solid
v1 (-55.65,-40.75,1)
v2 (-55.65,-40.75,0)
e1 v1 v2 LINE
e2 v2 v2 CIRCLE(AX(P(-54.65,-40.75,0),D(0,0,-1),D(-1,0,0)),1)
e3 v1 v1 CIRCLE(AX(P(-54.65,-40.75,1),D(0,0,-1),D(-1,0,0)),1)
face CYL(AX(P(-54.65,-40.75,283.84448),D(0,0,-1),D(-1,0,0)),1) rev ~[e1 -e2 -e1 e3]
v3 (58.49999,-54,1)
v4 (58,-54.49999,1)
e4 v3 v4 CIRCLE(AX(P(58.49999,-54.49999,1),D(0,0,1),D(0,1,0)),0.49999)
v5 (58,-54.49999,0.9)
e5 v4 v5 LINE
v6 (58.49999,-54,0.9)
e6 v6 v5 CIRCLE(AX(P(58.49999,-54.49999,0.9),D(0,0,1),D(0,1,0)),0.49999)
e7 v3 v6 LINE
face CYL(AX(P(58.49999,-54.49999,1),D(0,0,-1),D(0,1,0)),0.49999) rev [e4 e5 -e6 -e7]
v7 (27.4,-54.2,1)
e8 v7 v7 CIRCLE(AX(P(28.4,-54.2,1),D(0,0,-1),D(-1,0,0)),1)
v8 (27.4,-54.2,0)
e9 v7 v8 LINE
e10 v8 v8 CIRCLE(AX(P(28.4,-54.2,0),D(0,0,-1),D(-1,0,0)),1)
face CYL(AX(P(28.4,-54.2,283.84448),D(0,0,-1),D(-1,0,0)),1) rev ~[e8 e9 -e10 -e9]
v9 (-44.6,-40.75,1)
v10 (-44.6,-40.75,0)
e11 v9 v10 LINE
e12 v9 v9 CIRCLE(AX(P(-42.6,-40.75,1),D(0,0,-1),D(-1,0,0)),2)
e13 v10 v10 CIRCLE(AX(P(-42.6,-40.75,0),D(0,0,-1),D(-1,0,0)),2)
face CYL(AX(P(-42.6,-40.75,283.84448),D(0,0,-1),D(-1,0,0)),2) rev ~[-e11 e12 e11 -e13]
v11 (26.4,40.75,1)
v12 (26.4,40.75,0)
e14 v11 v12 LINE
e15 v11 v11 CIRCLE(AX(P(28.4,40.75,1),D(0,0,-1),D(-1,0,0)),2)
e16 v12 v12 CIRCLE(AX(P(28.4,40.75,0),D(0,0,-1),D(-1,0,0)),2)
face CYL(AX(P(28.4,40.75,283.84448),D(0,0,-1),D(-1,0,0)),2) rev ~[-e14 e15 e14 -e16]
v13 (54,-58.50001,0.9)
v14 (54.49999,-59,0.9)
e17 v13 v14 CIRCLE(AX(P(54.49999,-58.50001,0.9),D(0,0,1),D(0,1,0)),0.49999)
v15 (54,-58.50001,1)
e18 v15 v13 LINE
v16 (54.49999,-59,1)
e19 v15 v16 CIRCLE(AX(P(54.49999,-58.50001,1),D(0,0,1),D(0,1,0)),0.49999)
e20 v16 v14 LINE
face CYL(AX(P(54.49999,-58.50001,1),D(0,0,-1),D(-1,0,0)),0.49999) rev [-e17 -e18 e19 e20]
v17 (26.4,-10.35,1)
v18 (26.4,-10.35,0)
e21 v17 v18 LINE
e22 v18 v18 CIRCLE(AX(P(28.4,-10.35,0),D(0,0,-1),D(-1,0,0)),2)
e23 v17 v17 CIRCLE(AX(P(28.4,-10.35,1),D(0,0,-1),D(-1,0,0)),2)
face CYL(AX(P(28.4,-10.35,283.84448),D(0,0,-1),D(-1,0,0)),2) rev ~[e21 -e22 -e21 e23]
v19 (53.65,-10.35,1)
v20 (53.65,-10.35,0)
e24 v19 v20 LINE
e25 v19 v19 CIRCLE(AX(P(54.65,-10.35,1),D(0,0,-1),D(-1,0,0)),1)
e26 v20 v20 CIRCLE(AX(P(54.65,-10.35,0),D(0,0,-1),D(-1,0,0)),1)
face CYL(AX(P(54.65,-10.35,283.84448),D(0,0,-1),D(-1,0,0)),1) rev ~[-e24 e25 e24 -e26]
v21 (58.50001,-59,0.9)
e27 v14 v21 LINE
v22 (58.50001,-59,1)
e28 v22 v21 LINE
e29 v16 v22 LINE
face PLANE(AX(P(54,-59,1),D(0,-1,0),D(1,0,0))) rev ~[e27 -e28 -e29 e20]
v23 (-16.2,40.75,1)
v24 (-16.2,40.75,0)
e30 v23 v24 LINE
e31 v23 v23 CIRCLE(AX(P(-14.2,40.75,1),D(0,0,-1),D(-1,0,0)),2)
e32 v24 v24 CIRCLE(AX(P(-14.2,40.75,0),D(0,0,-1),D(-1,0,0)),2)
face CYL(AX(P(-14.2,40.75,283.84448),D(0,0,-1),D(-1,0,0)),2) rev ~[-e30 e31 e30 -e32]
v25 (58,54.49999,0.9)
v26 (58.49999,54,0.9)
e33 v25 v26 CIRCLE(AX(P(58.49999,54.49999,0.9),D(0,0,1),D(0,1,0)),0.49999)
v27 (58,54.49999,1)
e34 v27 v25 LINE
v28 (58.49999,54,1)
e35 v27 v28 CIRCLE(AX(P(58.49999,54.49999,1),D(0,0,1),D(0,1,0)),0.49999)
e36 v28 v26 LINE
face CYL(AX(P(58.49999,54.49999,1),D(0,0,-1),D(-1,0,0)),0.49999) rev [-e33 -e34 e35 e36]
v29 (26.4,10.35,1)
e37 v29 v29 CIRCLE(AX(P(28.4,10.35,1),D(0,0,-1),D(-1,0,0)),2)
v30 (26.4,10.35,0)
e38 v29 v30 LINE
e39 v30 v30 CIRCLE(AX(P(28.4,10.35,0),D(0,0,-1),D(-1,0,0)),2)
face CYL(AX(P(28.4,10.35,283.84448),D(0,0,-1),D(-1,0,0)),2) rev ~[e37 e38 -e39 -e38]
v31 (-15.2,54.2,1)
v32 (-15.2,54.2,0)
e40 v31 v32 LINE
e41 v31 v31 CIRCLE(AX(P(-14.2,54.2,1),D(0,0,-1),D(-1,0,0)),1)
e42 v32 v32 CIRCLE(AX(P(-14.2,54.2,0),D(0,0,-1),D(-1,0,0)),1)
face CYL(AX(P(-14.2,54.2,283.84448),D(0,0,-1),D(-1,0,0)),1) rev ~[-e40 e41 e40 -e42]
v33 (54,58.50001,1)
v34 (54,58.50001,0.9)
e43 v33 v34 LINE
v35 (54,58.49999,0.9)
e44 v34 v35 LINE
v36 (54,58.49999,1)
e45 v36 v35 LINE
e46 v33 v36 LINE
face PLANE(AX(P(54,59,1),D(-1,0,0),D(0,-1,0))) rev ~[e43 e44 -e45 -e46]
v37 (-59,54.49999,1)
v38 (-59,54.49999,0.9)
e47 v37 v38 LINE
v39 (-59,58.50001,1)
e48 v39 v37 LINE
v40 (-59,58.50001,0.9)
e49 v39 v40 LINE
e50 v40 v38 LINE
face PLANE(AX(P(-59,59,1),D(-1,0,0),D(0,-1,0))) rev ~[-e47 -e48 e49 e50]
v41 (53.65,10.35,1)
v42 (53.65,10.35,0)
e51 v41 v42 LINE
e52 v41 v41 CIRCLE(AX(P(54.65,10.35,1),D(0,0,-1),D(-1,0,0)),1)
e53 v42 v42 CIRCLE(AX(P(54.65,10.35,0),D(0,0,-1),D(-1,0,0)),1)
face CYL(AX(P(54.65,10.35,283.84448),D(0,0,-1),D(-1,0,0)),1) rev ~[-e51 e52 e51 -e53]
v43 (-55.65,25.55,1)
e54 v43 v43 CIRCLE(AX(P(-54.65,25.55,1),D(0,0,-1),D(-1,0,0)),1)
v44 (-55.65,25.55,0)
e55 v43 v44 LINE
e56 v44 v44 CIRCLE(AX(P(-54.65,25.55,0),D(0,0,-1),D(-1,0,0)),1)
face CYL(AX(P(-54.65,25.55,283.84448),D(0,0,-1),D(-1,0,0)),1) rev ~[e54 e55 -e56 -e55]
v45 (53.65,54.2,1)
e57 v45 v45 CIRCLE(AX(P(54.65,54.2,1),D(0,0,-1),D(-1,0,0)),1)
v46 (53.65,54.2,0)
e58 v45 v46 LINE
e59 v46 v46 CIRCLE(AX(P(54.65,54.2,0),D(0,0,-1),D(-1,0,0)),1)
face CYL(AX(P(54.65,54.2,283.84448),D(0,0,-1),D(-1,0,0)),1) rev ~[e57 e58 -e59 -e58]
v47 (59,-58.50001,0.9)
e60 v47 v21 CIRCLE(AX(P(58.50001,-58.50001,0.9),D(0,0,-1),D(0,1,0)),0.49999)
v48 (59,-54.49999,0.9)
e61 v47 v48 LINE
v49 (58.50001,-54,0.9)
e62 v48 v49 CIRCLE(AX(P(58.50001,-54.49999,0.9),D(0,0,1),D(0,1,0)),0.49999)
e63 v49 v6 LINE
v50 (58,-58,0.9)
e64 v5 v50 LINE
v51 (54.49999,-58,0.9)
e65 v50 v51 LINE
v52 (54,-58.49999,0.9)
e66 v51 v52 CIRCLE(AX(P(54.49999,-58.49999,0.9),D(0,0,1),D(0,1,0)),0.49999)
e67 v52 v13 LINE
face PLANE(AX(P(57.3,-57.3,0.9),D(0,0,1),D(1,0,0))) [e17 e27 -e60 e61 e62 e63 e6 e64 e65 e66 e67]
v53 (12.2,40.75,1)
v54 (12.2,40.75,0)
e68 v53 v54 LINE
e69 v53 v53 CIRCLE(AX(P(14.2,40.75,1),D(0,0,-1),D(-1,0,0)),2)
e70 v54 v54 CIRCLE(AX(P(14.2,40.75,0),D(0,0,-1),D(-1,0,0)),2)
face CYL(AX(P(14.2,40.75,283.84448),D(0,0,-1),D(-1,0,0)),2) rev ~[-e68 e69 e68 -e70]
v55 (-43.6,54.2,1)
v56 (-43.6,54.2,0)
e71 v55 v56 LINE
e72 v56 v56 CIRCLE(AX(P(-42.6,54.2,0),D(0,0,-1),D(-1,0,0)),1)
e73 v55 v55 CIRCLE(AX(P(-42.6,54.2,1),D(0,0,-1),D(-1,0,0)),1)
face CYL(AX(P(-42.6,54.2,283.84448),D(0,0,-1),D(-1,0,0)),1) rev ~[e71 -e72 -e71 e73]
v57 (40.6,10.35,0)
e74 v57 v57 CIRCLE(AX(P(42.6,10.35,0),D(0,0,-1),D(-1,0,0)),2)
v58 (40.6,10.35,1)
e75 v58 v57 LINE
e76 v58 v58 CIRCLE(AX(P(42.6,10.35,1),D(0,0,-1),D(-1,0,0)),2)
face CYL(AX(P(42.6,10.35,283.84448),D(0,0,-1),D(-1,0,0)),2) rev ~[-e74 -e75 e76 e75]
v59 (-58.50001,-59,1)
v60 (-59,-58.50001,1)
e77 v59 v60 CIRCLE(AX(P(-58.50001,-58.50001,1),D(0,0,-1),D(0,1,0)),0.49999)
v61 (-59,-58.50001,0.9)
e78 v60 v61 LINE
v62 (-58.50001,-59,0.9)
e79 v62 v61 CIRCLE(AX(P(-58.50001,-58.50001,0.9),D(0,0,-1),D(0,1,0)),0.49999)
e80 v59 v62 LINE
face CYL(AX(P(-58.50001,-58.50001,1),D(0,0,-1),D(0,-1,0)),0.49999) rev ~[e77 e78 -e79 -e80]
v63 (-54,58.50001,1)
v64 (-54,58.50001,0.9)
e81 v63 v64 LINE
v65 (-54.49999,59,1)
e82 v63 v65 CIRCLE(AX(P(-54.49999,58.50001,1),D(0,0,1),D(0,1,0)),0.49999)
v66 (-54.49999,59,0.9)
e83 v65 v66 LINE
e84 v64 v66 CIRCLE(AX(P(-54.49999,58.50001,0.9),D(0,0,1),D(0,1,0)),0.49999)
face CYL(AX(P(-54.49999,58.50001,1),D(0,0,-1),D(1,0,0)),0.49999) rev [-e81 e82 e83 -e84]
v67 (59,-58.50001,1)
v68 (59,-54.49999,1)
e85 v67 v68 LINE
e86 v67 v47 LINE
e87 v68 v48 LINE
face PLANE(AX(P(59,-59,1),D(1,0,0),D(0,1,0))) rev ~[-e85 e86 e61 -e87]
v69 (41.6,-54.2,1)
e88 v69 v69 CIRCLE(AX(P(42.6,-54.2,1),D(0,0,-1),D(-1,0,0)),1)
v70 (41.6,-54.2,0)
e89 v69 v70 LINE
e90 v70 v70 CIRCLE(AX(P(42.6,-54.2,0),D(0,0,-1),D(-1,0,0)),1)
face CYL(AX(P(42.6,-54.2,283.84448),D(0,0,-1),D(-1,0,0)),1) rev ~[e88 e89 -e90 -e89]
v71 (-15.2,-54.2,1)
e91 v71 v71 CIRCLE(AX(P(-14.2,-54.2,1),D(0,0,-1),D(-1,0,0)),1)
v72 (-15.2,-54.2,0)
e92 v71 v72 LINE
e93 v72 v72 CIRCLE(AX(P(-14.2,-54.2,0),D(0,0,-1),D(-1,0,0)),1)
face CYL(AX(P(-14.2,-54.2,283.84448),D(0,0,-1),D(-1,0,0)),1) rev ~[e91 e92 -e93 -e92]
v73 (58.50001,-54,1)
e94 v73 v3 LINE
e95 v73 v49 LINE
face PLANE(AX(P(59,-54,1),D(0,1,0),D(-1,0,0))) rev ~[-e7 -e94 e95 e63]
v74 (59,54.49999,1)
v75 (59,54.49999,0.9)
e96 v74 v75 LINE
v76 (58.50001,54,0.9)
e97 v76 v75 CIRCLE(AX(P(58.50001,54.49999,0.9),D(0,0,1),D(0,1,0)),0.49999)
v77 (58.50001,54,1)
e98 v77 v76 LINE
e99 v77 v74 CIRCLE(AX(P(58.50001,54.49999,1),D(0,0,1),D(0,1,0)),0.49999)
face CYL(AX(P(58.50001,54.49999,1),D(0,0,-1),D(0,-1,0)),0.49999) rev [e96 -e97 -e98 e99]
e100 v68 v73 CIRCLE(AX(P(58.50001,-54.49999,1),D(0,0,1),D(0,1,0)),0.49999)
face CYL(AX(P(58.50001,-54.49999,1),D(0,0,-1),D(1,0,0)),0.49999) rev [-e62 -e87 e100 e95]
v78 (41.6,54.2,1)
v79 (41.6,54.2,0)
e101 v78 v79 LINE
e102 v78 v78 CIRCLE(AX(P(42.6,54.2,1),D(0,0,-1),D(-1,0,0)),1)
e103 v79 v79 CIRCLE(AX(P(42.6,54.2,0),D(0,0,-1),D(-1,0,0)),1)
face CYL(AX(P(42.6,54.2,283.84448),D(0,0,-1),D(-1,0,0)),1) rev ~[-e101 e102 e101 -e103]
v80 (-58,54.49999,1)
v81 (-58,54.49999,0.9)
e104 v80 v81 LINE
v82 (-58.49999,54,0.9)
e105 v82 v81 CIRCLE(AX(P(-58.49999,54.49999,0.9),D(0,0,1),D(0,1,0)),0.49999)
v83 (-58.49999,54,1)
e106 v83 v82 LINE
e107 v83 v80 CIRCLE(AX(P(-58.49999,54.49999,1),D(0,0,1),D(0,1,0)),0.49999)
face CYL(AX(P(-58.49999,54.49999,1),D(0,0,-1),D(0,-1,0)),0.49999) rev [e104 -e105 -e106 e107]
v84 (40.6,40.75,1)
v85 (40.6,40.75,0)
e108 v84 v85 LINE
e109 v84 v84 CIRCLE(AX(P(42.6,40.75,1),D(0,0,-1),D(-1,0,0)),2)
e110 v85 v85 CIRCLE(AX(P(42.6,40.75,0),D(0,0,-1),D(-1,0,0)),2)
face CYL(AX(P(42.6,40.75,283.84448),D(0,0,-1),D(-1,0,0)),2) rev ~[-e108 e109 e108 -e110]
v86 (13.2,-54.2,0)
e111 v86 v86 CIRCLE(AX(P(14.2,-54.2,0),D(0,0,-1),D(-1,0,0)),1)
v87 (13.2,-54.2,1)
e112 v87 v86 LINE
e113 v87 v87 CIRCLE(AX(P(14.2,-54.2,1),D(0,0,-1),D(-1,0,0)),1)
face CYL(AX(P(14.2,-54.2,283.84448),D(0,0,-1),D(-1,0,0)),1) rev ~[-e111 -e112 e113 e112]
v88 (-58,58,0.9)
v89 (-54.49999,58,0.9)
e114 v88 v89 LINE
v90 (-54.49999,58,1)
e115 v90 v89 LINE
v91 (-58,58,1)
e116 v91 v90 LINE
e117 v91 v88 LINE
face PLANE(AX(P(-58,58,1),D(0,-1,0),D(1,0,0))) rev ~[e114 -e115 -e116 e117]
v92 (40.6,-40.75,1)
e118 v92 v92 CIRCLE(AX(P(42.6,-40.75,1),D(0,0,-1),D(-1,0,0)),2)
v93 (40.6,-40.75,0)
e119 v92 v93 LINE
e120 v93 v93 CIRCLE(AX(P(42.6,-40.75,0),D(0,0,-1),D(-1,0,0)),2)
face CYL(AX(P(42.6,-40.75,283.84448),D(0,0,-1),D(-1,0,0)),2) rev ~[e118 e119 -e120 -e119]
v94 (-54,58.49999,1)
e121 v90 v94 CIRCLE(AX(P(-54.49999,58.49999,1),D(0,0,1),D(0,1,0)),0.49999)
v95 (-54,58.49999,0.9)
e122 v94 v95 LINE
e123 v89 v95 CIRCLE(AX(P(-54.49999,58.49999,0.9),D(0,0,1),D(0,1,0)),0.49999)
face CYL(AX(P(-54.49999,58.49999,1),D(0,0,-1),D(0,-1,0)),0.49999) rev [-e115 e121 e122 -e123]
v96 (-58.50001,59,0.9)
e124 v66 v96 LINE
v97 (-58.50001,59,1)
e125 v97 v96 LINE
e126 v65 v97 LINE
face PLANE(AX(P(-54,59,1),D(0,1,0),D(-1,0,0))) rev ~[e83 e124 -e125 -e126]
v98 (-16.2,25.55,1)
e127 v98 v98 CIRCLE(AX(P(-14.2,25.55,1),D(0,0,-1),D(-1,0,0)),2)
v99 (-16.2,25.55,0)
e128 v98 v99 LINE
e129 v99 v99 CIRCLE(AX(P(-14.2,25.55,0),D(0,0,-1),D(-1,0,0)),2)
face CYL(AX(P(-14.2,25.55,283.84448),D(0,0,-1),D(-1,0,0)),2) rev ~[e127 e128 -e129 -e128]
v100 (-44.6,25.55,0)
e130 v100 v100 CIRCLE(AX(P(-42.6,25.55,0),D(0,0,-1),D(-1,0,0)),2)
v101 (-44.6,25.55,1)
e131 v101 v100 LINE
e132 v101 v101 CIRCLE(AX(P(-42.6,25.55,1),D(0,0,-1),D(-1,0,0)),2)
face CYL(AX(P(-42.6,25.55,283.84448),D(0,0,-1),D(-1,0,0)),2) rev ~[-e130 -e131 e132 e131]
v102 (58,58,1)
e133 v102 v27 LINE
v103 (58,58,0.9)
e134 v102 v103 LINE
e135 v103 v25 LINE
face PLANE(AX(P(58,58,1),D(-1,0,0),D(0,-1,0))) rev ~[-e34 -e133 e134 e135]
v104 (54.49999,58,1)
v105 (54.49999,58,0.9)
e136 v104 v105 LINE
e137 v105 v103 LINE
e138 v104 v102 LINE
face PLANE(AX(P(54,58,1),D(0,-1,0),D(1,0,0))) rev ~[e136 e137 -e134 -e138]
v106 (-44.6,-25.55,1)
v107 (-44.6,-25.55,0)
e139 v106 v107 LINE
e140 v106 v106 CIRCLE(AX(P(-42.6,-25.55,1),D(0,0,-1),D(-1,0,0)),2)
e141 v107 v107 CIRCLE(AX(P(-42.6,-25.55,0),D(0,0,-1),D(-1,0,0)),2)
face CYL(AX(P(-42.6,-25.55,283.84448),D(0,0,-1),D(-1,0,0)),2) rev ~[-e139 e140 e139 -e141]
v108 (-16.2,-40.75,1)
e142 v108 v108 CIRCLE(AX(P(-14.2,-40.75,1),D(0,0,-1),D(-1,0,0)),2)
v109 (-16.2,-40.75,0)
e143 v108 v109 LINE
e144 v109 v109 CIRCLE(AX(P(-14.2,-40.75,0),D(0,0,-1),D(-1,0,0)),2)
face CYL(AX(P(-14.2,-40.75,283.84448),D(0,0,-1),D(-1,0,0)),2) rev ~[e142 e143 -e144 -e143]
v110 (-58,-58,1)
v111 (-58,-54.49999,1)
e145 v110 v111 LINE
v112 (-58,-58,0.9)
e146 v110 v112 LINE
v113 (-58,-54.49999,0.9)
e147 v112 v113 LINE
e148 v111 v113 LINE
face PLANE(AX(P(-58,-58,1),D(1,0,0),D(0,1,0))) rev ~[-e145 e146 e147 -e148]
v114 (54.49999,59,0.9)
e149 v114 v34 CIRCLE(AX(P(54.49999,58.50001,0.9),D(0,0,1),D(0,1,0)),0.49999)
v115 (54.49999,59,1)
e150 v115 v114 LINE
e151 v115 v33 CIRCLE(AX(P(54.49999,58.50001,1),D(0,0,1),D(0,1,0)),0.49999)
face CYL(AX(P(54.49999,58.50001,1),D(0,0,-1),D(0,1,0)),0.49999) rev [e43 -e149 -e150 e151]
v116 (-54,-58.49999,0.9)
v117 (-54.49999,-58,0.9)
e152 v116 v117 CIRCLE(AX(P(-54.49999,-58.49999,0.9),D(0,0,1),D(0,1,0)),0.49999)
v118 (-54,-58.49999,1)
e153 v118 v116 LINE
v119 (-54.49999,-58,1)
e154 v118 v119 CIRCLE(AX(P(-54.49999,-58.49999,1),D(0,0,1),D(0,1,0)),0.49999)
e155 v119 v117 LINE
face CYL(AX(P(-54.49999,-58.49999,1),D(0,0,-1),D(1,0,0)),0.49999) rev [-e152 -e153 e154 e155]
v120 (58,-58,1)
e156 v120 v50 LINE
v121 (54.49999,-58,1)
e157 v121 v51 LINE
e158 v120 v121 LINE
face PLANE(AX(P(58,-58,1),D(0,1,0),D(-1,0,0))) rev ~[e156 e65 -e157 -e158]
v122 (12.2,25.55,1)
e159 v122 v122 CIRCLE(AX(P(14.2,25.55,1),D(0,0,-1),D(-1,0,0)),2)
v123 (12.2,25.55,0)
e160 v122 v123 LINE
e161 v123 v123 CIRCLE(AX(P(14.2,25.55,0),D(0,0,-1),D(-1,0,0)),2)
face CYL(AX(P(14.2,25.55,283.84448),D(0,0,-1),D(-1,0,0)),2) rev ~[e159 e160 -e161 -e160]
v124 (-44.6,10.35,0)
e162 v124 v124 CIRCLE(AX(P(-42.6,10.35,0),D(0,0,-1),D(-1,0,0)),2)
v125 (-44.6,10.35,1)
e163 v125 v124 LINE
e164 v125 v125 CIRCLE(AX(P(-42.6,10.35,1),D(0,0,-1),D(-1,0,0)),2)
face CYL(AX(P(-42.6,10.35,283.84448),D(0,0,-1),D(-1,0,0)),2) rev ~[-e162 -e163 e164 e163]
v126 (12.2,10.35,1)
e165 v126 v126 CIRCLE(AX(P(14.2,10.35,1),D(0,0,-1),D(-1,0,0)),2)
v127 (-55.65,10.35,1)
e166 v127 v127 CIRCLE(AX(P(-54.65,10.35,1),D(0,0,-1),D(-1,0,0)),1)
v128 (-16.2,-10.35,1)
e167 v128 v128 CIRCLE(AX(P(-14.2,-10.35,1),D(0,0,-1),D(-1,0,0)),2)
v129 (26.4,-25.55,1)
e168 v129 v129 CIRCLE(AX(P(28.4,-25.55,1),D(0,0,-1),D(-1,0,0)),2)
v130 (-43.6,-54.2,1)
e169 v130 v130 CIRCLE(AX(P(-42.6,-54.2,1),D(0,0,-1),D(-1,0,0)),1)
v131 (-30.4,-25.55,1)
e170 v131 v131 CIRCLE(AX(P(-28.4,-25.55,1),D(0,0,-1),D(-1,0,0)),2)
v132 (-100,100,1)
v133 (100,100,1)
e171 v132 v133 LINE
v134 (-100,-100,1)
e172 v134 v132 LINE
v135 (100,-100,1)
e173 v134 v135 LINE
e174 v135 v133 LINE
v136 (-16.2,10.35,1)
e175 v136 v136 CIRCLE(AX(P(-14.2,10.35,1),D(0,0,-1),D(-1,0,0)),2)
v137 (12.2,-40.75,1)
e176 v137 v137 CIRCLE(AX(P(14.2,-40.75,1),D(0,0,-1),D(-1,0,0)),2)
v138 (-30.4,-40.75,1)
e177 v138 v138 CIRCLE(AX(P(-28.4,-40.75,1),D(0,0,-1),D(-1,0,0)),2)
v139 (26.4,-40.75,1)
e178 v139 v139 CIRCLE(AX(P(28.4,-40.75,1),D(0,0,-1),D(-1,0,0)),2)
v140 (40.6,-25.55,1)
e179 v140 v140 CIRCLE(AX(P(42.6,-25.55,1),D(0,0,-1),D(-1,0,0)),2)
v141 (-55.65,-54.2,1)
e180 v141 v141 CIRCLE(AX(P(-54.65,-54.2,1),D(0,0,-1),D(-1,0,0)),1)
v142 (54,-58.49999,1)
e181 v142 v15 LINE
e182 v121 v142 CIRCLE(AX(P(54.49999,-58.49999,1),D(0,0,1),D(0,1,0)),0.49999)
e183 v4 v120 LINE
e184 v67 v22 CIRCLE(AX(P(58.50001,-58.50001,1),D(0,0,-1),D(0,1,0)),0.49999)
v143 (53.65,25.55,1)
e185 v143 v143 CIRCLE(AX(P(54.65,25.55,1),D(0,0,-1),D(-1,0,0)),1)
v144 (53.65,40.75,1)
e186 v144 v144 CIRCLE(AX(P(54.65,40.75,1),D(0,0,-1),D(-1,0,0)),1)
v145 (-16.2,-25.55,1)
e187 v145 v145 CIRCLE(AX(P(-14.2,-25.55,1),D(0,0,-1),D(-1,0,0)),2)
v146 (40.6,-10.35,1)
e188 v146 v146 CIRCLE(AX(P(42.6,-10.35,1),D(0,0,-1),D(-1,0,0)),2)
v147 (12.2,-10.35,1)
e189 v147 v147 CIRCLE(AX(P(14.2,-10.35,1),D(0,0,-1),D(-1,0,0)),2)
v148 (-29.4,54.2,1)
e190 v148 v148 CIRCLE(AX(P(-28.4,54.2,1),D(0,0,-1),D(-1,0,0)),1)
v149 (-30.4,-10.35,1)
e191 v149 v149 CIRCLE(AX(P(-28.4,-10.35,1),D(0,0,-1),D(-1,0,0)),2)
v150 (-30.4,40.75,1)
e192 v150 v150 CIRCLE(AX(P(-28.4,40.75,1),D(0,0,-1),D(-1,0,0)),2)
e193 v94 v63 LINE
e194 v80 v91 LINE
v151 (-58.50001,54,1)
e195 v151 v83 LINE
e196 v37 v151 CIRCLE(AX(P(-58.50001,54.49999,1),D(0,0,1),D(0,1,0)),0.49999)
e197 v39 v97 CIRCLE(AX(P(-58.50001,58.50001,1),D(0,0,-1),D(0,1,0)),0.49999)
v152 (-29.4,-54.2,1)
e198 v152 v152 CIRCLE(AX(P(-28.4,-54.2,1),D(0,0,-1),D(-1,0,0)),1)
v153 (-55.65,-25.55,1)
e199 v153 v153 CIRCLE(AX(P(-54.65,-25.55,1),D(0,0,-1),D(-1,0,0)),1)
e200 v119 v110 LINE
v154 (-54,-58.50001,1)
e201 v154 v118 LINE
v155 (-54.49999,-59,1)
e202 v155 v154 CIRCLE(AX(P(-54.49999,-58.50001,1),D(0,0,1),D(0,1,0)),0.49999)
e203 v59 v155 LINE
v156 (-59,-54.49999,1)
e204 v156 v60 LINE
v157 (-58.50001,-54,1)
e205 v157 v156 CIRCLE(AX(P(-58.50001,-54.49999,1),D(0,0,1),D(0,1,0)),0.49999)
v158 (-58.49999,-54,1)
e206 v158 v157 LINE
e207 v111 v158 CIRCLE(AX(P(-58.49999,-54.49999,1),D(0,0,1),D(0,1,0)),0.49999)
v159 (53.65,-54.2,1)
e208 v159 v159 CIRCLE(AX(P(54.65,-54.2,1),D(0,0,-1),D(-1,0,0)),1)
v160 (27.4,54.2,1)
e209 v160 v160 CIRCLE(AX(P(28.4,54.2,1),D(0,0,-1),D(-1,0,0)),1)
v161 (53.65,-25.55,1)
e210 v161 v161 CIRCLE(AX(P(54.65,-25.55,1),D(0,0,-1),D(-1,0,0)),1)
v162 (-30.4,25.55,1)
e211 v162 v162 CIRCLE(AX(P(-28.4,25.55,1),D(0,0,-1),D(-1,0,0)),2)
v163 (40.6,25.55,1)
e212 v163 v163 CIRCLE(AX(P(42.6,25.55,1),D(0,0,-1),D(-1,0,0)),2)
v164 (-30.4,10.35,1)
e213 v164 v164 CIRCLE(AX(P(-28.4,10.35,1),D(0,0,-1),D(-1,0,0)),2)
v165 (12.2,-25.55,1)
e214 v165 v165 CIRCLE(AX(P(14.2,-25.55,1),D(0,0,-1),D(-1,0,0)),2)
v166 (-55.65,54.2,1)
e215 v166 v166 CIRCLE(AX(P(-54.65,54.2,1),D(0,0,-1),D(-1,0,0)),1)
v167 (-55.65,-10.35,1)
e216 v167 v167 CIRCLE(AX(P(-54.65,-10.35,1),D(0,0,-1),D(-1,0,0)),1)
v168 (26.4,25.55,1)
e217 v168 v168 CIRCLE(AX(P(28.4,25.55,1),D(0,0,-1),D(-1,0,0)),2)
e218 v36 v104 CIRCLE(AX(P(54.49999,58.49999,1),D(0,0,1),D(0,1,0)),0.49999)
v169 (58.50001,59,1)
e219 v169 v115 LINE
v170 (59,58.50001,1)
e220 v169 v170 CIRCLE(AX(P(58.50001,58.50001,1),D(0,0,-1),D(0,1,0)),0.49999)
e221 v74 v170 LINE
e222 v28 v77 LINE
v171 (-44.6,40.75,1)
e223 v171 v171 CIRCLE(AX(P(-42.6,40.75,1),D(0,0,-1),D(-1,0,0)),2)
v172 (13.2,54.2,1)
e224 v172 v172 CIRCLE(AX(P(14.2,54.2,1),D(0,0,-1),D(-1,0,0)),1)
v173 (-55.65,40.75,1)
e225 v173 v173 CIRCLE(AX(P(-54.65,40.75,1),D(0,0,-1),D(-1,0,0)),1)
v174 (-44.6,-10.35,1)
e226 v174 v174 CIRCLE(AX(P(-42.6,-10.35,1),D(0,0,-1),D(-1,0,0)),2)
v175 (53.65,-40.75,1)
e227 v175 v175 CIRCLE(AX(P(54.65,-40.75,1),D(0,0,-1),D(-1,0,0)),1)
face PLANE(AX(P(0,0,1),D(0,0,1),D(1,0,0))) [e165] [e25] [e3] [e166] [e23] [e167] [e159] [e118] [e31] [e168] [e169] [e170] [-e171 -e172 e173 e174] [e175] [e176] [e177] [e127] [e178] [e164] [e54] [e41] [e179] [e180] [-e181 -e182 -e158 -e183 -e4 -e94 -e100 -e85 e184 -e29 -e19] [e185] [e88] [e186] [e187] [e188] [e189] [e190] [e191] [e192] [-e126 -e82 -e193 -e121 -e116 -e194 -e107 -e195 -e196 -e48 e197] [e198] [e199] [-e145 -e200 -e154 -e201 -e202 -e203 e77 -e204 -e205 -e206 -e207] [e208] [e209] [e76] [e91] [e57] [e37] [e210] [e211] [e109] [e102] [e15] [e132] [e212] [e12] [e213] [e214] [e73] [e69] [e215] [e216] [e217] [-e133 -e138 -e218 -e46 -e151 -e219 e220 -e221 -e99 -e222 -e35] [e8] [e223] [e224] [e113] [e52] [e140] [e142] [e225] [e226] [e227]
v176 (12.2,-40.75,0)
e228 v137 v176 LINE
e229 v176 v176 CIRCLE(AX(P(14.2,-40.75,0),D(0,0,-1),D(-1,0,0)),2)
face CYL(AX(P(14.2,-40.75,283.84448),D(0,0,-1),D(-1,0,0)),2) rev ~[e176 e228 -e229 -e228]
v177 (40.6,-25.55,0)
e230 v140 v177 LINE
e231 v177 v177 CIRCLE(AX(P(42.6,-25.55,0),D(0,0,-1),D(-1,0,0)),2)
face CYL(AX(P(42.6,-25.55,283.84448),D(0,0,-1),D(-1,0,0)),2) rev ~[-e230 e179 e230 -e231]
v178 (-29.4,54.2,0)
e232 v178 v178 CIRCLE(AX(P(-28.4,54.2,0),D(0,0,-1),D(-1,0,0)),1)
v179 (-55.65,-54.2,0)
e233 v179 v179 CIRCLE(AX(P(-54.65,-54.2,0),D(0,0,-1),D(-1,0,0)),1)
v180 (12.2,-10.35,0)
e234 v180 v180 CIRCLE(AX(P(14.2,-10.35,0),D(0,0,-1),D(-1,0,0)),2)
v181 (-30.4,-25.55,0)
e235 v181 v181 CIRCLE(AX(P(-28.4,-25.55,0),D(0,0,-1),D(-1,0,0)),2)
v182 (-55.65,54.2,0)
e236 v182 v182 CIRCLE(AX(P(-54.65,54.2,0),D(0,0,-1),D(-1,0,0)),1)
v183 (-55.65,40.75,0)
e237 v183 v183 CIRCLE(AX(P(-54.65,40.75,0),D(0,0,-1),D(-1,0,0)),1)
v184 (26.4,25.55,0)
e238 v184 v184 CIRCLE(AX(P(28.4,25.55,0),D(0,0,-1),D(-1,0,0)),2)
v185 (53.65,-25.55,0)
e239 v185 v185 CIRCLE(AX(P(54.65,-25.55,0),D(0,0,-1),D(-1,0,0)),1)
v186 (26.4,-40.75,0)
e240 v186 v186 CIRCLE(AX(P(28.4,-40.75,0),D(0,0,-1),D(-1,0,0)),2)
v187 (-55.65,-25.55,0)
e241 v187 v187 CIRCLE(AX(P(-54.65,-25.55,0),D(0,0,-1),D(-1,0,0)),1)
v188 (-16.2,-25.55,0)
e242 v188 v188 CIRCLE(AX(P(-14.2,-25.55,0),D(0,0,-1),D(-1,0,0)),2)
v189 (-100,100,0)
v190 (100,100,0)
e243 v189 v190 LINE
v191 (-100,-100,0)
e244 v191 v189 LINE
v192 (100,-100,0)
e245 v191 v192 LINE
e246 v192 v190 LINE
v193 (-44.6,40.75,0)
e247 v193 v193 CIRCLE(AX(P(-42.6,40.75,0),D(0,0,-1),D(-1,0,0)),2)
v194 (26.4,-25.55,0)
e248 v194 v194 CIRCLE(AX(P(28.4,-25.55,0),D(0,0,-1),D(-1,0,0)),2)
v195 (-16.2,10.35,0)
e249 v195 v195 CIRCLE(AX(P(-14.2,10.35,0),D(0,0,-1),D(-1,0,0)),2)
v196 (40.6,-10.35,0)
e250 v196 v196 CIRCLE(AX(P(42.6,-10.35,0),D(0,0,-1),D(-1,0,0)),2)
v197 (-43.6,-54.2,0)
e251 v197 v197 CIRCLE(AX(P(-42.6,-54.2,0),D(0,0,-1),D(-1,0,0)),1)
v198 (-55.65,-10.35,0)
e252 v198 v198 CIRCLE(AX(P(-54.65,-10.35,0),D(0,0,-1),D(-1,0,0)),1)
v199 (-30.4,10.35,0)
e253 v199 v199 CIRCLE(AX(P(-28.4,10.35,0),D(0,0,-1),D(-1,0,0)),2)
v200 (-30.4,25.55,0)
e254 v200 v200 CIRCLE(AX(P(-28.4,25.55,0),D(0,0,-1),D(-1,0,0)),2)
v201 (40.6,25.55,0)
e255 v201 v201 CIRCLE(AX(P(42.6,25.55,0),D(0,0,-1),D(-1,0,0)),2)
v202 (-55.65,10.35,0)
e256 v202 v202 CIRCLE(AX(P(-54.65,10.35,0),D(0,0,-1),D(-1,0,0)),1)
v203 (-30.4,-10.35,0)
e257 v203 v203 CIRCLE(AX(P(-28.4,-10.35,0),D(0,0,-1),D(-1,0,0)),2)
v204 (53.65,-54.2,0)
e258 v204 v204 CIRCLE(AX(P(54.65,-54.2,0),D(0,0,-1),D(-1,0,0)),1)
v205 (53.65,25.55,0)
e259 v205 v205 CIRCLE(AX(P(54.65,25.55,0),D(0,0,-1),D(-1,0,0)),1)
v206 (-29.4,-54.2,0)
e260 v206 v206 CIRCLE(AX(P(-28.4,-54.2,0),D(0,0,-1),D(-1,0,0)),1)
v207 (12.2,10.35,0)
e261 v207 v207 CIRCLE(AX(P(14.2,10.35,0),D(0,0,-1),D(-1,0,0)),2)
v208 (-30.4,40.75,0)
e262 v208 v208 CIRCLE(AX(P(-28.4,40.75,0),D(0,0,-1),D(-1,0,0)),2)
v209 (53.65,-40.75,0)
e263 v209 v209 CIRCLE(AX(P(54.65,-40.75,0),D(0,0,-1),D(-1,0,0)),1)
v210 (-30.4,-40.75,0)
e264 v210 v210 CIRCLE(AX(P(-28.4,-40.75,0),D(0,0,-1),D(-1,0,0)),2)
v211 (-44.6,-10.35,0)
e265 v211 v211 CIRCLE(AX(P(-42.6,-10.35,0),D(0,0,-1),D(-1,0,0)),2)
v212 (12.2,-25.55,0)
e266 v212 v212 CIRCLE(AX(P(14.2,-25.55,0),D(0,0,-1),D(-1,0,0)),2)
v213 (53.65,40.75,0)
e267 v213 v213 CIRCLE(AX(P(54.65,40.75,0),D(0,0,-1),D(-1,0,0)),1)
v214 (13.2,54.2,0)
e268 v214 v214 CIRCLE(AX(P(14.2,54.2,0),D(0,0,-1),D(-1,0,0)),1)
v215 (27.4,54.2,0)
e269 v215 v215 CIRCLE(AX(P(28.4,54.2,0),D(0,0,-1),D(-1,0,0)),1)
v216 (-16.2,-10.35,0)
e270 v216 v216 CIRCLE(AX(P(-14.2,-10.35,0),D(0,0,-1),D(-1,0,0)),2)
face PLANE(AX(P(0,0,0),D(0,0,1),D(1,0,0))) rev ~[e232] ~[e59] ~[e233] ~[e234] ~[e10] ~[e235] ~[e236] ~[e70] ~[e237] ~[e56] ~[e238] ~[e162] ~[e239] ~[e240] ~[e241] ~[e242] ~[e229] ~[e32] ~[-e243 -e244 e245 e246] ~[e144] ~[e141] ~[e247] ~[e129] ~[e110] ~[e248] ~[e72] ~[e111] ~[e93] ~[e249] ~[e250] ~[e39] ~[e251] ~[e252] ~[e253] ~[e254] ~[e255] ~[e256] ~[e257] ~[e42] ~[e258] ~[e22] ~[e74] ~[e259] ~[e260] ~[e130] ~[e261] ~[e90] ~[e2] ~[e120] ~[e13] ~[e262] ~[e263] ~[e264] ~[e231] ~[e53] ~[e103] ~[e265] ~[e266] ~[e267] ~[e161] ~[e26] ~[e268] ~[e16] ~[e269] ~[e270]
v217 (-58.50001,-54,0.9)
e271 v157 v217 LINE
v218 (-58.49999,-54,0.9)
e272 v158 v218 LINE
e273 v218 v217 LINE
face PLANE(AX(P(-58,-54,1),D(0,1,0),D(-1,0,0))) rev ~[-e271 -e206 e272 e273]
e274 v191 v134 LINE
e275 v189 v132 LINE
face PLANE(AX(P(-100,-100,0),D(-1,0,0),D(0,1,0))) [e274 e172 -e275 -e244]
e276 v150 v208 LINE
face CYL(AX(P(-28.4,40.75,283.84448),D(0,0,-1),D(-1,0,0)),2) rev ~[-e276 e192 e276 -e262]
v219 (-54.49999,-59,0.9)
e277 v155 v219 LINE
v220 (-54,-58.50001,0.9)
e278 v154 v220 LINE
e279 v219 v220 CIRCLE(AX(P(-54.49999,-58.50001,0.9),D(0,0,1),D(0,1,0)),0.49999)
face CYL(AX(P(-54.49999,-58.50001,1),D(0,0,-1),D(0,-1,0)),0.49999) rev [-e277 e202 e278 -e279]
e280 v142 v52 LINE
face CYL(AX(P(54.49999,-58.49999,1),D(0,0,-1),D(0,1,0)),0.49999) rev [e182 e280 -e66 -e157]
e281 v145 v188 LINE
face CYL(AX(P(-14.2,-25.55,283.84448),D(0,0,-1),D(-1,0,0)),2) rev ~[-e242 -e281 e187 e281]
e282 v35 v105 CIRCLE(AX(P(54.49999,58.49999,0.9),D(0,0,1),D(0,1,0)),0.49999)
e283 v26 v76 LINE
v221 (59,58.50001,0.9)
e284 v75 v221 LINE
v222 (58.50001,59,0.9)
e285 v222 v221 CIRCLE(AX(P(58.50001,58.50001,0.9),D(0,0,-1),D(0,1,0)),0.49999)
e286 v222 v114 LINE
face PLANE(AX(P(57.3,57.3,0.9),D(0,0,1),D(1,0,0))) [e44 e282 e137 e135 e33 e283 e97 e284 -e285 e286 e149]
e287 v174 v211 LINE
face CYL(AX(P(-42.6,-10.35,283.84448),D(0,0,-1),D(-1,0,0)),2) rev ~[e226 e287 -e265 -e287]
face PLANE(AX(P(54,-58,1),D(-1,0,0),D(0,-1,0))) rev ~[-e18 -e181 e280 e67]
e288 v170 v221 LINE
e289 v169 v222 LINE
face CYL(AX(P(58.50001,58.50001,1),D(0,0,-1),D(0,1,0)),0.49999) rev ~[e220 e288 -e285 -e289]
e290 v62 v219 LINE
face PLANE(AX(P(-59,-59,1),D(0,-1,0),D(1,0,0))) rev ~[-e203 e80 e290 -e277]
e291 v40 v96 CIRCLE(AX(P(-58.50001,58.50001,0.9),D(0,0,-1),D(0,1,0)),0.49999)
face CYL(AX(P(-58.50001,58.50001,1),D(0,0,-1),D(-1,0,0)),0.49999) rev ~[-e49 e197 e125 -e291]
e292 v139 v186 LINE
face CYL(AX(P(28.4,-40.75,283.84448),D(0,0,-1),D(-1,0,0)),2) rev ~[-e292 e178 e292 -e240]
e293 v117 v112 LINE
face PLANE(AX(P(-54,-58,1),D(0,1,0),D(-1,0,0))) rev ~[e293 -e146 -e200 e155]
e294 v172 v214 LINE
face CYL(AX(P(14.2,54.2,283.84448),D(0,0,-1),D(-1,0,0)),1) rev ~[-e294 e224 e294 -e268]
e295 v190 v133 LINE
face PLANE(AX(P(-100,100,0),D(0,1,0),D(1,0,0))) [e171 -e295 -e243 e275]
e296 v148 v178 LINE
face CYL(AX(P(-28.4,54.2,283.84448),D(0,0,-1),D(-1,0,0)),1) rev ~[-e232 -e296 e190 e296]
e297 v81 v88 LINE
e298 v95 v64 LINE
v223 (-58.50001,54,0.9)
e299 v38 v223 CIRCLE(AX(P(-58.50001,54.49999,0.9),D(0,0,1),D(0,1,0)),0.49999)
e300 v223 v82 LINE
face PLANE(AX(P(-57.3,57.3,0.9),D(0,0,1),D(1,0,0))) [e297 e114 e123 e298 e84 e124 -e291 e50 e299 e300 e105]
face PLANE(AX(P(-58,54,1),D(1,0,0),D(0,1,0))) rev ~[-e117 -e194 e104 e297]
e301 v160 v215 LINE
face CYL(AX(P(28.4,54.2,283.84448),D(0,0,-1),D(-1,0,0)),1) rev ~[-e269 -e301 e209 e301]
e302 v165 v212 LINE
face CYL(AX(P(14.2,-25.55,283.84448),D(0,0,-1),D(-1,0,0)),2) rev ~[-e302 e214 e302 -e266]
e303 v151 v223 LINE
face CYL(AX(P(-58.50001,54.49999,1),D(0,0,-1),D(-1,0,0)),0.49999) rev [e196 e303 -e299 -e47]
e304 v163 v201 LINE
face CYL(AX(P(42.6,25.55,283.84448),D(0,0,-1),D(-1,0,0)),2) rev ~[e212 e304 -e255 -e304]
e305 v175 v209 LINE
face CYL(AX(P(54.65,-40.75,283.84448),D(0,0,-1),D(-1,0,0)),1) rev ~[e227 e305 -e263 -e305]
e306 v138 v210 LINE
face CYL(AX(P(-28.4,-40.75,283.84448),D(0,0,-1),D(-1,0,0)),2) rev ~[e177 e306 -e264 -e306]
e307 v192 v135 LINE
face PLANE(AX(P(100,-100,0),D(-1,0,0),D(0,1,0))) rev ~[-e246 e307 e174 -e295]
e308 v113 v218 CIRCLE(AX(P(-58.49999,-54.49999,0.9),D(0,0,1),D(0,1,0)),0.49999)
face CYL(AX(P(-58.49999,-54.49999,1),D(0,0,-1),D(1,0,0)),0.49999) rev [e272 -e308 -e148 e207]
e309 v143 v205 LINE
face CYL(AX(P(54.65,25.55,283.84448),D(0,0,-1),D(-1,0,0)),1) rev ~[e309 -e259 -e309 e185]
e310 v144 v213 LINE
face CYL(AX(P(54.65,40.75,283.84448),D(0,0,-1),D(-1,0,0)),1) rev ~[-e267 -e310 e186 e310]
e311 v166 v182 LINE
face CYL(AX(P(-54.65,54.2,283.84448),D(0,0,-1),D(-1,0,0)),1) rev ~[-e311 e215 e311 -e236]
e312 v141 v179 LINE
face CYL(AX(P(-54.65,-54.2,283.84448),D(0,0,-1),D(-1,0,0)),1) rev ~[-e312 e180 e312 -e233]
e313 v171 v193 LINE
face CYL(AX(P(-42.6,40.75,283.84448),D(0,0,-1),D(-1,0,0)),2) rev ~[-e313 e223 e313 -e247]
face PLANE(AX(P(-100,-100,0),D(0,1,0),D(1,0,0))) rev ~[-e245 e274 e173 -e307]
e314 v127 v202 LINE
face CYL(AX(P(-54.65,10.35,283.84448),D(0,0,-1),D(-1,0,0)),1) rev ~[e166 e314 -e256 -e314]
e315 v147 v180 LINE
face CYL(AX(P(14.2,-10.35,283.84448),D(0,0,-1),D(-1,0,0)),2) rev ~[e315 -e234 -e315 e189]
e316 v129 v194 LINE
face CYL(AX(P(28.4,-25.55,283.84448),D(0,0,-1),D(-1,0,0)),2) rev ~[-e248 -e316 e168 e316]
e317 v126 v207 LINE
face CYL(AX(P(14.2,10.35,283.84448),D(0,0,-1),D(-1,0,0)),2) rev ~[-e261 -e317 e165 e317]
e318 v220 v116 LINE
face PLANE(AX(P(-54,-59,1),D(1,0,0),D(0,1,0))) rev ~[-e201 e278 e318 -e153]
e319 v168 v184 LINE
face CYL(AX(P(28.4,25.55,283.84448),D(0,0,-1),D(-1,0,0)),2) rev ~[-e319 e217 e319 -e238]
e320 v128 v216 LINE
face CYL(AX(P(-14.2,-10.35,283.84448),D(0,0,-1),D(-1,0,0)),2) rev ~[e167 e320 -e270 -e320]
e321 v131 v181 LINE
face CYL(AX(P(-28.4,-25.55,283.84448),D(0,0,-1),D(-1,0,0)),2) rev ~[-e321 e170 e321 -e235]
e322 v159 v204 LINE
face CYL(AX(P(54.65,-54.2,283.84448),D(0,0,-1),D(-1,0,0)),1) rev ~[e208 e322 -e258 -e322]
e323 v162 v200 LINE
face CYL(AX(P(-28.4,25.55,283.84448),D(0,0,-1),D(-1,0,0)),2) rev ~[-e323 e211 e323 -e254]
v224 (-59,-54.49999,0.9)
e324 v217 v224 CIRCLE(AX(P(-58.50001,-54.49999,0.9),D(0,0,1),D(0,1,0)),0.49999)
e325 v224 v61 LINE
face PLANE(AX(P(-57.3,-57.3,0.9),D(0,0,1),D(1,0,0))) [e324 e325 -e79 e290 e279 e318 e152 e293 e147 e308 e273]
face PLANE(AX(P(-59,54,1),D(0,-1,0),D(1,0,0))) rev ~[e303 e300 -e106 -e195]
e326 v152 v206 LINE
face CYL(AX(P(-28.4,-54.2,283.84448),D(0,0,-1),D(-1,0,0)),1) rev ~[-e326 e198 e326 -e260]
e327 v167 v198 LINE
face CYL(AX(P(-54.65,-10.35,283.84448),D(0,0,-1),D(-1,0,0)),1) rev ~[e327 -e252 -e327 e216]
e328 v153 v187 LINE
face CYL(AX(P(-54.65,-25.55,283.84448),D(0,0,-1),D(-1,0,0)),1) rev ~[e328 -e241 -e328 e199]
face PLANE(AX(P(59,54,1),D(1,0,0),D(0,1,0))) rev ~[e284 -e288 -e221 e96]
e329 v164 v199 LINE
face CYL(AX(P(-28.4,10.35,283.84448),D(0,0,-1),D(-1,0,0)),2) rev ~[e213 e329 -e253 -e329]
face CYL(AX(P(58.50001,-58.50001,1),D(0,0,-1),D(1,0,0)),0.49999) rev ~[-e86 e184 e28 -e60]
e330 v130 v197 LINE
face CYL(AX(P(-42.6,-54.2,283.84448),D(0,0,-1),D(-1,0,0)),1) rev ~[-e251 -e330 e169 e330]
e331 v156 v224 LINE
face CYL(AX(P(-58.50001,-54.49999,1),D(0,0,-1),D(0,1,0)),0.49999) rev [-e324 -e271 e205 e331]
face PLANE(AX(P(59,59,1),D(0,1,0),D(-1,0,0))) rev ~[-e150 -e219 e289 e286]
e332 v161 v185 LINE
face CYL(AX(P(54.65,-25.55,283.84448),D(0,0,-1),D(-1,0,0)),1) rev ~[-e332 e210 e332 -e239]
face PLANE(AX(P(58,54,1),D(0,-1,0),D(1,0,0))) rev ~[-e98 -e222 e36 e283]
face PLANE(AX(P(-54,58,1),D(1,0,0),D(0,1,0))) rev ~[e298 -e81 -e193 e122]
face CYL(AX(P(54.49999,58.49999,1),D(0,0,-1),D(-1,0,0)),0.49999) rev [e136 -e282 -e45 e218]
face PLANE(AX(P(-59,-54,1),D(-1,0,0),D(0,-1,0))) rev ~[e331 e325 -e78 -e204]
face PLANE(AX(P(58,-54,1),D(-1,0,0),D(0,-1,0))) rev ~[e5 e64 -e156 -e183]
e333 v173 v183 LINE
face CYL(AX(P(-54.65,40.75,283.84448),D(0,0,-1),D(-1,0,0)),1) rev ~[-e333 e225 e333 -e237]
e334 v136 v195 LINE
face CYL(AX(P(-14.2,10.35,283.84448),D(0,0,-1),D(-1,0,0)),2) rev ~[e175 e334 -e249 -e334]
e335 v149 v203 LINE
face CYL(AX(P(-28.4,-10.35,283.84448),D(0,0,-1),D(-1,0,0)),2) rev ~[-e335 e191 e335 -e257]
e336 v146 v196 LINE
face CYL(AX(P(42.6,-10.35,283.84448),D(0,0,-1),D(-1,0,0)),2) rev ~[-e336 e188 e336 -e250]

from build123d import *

# Parameters (mm, degrees)
F0_W     = 200
F0_H     = 200
F1_DEPTH = 1
F3_D     = 4
F5_D     = 2
F7_DEPTH = 0.1
F8_R     = 0.49999


# Not quite as in the source:
# - a fillet or chamfer is up to 0.001 mm smaller than in the source, because OpenCascade refuses the exact size


with BuildPart() as f1:
    # F0 (on Top) → F1 (new body)
    with BuildSketch(Plane.XY):
        Rectangle(F0_W, F0_H)
    extrude(amount=F1_DEPTH)

    # F3 (through all)
    with Locations(Plane.XY.offset(1)):
        with Locations((-42.6, 40.75), (-28.4, 40.75), (-14.2, 40.75), (14.2, 40.75), (28.4, 40.75), (42.6, 40.75), (-42.6, 25.55), (-28.4, 25.55), (-14.2, 25.55), (14.2, 25.55), (28.4, 25.55), (42.6, 25.55), (42.6, 10.35), (28.4, 10.35), (14.2, 10.35), (-14.2, 10.35), (-28.4, 10.35), (-42.6, 10.35), (-42.6, -10.35), (-28.4, -10.35), (-14.2, -10.35), (14.2, -10.35), (28.4, -10.35), (42.6, -10.35), (42.6, -25.55), (28.4, -25.55), (14.2, -25.55), (-14.2, -25.55), (-28.4, -25.55), (-42.6, -25.55), (-42.6, -40.75), (-28.4, -40.75), (-14.2, -40.75), (14.2, -40.75), (28.4, -40.75), (42.6, -40.75)):
            Hole(F3_D / 2)

    # F5 (through all)
    with Locations(Plane.XY.offset(1)):
        with Locations((-54.65, 54.2), (-42.6, 54.2), (-28.4, 54.2), (-14.2, 54.2), (14.2, 54.2), (28.4, 54.2), (42.6, 54.2), (54.65, 54.2), (54.65, 40.75), (54.65, 25.55), (54.65, 10.35), (54.65, -10.35), (54.65, -25.55), (54.65, -40.75), (54.65, -54.2), (42.6, -54.2), (28.4, -54.2), (14.2, -54.2), (-14.2, -54.2), (-28.4, -54.2), (-42.6, -54.2), (-54.65, -54.2), (-54.65, -40.75), (-54.65, -25.55), (-54.65, -10.35), (-54.65, 10.35), (-54.65, 25.55), (-54.65, 40.75)):
            Hole(F5_D / 2)

    # F6 (on face) → F7 (cut)
    with BuildSketch(Plane.XY.offset(1)):
        Polygon((-58, 59), (-59, 59), (-59, 58), (-59, 54), (-58, 54), (-58, 58), (-54, 58), (-54, 59), align=None)
        Polygon((-59, -58), (-59, -59), (-58, -59), (-54, -59), (-54, -58), (-58, -58), (-58, -54), (-59, -54), align=None)
        Polygon((58, -59), (59, -59), (59, -58), (59, -54), (58, -54), (58, -58), (54, -58), (54, -59), align=None)
        Polygon((59, 58), (59, 59), (58, 59), (54, 59), (54, 58), (58, 58), (58, 54), (59, 54), align=None)
    extrude(amount=-F7_DEPTH, mode=Mode.SUBTRACT)

    # F8 (radius 0.5 in the source; OpenCascade refuses exactly that, so slightly less here)
    f8_edges = [f1.edges().sort_by_distance(p)[0] for p in [
        (-54, 59, 0.95),
        (-54, 58, 0.95),
        (-59, 59, 0.95),
        (-59, 54, 0.95),
        (-58, 54, 0.95),
        (54, 59, 0.95),
        (54, 58, 0.95),
        (59, 59, 0.95),
        (59, 54, 0.95),
        (58, 54, 0.95),
        (59, -54, 0.95),
        (58, -54, 0.95),
        (59, -59, 0.95),
        (54, -58, 0.95),
        (54, -59, 0.95),
        (-58, -54, 0.95),
        (-59, -54, 0.95),
        (-59, -59, 0.95),
        (-54, -58, 0.95),
        (-54, -59, 0.95),
    ]]
    fillet(f8_edges, radius=F8_R)


solid = f1.part
